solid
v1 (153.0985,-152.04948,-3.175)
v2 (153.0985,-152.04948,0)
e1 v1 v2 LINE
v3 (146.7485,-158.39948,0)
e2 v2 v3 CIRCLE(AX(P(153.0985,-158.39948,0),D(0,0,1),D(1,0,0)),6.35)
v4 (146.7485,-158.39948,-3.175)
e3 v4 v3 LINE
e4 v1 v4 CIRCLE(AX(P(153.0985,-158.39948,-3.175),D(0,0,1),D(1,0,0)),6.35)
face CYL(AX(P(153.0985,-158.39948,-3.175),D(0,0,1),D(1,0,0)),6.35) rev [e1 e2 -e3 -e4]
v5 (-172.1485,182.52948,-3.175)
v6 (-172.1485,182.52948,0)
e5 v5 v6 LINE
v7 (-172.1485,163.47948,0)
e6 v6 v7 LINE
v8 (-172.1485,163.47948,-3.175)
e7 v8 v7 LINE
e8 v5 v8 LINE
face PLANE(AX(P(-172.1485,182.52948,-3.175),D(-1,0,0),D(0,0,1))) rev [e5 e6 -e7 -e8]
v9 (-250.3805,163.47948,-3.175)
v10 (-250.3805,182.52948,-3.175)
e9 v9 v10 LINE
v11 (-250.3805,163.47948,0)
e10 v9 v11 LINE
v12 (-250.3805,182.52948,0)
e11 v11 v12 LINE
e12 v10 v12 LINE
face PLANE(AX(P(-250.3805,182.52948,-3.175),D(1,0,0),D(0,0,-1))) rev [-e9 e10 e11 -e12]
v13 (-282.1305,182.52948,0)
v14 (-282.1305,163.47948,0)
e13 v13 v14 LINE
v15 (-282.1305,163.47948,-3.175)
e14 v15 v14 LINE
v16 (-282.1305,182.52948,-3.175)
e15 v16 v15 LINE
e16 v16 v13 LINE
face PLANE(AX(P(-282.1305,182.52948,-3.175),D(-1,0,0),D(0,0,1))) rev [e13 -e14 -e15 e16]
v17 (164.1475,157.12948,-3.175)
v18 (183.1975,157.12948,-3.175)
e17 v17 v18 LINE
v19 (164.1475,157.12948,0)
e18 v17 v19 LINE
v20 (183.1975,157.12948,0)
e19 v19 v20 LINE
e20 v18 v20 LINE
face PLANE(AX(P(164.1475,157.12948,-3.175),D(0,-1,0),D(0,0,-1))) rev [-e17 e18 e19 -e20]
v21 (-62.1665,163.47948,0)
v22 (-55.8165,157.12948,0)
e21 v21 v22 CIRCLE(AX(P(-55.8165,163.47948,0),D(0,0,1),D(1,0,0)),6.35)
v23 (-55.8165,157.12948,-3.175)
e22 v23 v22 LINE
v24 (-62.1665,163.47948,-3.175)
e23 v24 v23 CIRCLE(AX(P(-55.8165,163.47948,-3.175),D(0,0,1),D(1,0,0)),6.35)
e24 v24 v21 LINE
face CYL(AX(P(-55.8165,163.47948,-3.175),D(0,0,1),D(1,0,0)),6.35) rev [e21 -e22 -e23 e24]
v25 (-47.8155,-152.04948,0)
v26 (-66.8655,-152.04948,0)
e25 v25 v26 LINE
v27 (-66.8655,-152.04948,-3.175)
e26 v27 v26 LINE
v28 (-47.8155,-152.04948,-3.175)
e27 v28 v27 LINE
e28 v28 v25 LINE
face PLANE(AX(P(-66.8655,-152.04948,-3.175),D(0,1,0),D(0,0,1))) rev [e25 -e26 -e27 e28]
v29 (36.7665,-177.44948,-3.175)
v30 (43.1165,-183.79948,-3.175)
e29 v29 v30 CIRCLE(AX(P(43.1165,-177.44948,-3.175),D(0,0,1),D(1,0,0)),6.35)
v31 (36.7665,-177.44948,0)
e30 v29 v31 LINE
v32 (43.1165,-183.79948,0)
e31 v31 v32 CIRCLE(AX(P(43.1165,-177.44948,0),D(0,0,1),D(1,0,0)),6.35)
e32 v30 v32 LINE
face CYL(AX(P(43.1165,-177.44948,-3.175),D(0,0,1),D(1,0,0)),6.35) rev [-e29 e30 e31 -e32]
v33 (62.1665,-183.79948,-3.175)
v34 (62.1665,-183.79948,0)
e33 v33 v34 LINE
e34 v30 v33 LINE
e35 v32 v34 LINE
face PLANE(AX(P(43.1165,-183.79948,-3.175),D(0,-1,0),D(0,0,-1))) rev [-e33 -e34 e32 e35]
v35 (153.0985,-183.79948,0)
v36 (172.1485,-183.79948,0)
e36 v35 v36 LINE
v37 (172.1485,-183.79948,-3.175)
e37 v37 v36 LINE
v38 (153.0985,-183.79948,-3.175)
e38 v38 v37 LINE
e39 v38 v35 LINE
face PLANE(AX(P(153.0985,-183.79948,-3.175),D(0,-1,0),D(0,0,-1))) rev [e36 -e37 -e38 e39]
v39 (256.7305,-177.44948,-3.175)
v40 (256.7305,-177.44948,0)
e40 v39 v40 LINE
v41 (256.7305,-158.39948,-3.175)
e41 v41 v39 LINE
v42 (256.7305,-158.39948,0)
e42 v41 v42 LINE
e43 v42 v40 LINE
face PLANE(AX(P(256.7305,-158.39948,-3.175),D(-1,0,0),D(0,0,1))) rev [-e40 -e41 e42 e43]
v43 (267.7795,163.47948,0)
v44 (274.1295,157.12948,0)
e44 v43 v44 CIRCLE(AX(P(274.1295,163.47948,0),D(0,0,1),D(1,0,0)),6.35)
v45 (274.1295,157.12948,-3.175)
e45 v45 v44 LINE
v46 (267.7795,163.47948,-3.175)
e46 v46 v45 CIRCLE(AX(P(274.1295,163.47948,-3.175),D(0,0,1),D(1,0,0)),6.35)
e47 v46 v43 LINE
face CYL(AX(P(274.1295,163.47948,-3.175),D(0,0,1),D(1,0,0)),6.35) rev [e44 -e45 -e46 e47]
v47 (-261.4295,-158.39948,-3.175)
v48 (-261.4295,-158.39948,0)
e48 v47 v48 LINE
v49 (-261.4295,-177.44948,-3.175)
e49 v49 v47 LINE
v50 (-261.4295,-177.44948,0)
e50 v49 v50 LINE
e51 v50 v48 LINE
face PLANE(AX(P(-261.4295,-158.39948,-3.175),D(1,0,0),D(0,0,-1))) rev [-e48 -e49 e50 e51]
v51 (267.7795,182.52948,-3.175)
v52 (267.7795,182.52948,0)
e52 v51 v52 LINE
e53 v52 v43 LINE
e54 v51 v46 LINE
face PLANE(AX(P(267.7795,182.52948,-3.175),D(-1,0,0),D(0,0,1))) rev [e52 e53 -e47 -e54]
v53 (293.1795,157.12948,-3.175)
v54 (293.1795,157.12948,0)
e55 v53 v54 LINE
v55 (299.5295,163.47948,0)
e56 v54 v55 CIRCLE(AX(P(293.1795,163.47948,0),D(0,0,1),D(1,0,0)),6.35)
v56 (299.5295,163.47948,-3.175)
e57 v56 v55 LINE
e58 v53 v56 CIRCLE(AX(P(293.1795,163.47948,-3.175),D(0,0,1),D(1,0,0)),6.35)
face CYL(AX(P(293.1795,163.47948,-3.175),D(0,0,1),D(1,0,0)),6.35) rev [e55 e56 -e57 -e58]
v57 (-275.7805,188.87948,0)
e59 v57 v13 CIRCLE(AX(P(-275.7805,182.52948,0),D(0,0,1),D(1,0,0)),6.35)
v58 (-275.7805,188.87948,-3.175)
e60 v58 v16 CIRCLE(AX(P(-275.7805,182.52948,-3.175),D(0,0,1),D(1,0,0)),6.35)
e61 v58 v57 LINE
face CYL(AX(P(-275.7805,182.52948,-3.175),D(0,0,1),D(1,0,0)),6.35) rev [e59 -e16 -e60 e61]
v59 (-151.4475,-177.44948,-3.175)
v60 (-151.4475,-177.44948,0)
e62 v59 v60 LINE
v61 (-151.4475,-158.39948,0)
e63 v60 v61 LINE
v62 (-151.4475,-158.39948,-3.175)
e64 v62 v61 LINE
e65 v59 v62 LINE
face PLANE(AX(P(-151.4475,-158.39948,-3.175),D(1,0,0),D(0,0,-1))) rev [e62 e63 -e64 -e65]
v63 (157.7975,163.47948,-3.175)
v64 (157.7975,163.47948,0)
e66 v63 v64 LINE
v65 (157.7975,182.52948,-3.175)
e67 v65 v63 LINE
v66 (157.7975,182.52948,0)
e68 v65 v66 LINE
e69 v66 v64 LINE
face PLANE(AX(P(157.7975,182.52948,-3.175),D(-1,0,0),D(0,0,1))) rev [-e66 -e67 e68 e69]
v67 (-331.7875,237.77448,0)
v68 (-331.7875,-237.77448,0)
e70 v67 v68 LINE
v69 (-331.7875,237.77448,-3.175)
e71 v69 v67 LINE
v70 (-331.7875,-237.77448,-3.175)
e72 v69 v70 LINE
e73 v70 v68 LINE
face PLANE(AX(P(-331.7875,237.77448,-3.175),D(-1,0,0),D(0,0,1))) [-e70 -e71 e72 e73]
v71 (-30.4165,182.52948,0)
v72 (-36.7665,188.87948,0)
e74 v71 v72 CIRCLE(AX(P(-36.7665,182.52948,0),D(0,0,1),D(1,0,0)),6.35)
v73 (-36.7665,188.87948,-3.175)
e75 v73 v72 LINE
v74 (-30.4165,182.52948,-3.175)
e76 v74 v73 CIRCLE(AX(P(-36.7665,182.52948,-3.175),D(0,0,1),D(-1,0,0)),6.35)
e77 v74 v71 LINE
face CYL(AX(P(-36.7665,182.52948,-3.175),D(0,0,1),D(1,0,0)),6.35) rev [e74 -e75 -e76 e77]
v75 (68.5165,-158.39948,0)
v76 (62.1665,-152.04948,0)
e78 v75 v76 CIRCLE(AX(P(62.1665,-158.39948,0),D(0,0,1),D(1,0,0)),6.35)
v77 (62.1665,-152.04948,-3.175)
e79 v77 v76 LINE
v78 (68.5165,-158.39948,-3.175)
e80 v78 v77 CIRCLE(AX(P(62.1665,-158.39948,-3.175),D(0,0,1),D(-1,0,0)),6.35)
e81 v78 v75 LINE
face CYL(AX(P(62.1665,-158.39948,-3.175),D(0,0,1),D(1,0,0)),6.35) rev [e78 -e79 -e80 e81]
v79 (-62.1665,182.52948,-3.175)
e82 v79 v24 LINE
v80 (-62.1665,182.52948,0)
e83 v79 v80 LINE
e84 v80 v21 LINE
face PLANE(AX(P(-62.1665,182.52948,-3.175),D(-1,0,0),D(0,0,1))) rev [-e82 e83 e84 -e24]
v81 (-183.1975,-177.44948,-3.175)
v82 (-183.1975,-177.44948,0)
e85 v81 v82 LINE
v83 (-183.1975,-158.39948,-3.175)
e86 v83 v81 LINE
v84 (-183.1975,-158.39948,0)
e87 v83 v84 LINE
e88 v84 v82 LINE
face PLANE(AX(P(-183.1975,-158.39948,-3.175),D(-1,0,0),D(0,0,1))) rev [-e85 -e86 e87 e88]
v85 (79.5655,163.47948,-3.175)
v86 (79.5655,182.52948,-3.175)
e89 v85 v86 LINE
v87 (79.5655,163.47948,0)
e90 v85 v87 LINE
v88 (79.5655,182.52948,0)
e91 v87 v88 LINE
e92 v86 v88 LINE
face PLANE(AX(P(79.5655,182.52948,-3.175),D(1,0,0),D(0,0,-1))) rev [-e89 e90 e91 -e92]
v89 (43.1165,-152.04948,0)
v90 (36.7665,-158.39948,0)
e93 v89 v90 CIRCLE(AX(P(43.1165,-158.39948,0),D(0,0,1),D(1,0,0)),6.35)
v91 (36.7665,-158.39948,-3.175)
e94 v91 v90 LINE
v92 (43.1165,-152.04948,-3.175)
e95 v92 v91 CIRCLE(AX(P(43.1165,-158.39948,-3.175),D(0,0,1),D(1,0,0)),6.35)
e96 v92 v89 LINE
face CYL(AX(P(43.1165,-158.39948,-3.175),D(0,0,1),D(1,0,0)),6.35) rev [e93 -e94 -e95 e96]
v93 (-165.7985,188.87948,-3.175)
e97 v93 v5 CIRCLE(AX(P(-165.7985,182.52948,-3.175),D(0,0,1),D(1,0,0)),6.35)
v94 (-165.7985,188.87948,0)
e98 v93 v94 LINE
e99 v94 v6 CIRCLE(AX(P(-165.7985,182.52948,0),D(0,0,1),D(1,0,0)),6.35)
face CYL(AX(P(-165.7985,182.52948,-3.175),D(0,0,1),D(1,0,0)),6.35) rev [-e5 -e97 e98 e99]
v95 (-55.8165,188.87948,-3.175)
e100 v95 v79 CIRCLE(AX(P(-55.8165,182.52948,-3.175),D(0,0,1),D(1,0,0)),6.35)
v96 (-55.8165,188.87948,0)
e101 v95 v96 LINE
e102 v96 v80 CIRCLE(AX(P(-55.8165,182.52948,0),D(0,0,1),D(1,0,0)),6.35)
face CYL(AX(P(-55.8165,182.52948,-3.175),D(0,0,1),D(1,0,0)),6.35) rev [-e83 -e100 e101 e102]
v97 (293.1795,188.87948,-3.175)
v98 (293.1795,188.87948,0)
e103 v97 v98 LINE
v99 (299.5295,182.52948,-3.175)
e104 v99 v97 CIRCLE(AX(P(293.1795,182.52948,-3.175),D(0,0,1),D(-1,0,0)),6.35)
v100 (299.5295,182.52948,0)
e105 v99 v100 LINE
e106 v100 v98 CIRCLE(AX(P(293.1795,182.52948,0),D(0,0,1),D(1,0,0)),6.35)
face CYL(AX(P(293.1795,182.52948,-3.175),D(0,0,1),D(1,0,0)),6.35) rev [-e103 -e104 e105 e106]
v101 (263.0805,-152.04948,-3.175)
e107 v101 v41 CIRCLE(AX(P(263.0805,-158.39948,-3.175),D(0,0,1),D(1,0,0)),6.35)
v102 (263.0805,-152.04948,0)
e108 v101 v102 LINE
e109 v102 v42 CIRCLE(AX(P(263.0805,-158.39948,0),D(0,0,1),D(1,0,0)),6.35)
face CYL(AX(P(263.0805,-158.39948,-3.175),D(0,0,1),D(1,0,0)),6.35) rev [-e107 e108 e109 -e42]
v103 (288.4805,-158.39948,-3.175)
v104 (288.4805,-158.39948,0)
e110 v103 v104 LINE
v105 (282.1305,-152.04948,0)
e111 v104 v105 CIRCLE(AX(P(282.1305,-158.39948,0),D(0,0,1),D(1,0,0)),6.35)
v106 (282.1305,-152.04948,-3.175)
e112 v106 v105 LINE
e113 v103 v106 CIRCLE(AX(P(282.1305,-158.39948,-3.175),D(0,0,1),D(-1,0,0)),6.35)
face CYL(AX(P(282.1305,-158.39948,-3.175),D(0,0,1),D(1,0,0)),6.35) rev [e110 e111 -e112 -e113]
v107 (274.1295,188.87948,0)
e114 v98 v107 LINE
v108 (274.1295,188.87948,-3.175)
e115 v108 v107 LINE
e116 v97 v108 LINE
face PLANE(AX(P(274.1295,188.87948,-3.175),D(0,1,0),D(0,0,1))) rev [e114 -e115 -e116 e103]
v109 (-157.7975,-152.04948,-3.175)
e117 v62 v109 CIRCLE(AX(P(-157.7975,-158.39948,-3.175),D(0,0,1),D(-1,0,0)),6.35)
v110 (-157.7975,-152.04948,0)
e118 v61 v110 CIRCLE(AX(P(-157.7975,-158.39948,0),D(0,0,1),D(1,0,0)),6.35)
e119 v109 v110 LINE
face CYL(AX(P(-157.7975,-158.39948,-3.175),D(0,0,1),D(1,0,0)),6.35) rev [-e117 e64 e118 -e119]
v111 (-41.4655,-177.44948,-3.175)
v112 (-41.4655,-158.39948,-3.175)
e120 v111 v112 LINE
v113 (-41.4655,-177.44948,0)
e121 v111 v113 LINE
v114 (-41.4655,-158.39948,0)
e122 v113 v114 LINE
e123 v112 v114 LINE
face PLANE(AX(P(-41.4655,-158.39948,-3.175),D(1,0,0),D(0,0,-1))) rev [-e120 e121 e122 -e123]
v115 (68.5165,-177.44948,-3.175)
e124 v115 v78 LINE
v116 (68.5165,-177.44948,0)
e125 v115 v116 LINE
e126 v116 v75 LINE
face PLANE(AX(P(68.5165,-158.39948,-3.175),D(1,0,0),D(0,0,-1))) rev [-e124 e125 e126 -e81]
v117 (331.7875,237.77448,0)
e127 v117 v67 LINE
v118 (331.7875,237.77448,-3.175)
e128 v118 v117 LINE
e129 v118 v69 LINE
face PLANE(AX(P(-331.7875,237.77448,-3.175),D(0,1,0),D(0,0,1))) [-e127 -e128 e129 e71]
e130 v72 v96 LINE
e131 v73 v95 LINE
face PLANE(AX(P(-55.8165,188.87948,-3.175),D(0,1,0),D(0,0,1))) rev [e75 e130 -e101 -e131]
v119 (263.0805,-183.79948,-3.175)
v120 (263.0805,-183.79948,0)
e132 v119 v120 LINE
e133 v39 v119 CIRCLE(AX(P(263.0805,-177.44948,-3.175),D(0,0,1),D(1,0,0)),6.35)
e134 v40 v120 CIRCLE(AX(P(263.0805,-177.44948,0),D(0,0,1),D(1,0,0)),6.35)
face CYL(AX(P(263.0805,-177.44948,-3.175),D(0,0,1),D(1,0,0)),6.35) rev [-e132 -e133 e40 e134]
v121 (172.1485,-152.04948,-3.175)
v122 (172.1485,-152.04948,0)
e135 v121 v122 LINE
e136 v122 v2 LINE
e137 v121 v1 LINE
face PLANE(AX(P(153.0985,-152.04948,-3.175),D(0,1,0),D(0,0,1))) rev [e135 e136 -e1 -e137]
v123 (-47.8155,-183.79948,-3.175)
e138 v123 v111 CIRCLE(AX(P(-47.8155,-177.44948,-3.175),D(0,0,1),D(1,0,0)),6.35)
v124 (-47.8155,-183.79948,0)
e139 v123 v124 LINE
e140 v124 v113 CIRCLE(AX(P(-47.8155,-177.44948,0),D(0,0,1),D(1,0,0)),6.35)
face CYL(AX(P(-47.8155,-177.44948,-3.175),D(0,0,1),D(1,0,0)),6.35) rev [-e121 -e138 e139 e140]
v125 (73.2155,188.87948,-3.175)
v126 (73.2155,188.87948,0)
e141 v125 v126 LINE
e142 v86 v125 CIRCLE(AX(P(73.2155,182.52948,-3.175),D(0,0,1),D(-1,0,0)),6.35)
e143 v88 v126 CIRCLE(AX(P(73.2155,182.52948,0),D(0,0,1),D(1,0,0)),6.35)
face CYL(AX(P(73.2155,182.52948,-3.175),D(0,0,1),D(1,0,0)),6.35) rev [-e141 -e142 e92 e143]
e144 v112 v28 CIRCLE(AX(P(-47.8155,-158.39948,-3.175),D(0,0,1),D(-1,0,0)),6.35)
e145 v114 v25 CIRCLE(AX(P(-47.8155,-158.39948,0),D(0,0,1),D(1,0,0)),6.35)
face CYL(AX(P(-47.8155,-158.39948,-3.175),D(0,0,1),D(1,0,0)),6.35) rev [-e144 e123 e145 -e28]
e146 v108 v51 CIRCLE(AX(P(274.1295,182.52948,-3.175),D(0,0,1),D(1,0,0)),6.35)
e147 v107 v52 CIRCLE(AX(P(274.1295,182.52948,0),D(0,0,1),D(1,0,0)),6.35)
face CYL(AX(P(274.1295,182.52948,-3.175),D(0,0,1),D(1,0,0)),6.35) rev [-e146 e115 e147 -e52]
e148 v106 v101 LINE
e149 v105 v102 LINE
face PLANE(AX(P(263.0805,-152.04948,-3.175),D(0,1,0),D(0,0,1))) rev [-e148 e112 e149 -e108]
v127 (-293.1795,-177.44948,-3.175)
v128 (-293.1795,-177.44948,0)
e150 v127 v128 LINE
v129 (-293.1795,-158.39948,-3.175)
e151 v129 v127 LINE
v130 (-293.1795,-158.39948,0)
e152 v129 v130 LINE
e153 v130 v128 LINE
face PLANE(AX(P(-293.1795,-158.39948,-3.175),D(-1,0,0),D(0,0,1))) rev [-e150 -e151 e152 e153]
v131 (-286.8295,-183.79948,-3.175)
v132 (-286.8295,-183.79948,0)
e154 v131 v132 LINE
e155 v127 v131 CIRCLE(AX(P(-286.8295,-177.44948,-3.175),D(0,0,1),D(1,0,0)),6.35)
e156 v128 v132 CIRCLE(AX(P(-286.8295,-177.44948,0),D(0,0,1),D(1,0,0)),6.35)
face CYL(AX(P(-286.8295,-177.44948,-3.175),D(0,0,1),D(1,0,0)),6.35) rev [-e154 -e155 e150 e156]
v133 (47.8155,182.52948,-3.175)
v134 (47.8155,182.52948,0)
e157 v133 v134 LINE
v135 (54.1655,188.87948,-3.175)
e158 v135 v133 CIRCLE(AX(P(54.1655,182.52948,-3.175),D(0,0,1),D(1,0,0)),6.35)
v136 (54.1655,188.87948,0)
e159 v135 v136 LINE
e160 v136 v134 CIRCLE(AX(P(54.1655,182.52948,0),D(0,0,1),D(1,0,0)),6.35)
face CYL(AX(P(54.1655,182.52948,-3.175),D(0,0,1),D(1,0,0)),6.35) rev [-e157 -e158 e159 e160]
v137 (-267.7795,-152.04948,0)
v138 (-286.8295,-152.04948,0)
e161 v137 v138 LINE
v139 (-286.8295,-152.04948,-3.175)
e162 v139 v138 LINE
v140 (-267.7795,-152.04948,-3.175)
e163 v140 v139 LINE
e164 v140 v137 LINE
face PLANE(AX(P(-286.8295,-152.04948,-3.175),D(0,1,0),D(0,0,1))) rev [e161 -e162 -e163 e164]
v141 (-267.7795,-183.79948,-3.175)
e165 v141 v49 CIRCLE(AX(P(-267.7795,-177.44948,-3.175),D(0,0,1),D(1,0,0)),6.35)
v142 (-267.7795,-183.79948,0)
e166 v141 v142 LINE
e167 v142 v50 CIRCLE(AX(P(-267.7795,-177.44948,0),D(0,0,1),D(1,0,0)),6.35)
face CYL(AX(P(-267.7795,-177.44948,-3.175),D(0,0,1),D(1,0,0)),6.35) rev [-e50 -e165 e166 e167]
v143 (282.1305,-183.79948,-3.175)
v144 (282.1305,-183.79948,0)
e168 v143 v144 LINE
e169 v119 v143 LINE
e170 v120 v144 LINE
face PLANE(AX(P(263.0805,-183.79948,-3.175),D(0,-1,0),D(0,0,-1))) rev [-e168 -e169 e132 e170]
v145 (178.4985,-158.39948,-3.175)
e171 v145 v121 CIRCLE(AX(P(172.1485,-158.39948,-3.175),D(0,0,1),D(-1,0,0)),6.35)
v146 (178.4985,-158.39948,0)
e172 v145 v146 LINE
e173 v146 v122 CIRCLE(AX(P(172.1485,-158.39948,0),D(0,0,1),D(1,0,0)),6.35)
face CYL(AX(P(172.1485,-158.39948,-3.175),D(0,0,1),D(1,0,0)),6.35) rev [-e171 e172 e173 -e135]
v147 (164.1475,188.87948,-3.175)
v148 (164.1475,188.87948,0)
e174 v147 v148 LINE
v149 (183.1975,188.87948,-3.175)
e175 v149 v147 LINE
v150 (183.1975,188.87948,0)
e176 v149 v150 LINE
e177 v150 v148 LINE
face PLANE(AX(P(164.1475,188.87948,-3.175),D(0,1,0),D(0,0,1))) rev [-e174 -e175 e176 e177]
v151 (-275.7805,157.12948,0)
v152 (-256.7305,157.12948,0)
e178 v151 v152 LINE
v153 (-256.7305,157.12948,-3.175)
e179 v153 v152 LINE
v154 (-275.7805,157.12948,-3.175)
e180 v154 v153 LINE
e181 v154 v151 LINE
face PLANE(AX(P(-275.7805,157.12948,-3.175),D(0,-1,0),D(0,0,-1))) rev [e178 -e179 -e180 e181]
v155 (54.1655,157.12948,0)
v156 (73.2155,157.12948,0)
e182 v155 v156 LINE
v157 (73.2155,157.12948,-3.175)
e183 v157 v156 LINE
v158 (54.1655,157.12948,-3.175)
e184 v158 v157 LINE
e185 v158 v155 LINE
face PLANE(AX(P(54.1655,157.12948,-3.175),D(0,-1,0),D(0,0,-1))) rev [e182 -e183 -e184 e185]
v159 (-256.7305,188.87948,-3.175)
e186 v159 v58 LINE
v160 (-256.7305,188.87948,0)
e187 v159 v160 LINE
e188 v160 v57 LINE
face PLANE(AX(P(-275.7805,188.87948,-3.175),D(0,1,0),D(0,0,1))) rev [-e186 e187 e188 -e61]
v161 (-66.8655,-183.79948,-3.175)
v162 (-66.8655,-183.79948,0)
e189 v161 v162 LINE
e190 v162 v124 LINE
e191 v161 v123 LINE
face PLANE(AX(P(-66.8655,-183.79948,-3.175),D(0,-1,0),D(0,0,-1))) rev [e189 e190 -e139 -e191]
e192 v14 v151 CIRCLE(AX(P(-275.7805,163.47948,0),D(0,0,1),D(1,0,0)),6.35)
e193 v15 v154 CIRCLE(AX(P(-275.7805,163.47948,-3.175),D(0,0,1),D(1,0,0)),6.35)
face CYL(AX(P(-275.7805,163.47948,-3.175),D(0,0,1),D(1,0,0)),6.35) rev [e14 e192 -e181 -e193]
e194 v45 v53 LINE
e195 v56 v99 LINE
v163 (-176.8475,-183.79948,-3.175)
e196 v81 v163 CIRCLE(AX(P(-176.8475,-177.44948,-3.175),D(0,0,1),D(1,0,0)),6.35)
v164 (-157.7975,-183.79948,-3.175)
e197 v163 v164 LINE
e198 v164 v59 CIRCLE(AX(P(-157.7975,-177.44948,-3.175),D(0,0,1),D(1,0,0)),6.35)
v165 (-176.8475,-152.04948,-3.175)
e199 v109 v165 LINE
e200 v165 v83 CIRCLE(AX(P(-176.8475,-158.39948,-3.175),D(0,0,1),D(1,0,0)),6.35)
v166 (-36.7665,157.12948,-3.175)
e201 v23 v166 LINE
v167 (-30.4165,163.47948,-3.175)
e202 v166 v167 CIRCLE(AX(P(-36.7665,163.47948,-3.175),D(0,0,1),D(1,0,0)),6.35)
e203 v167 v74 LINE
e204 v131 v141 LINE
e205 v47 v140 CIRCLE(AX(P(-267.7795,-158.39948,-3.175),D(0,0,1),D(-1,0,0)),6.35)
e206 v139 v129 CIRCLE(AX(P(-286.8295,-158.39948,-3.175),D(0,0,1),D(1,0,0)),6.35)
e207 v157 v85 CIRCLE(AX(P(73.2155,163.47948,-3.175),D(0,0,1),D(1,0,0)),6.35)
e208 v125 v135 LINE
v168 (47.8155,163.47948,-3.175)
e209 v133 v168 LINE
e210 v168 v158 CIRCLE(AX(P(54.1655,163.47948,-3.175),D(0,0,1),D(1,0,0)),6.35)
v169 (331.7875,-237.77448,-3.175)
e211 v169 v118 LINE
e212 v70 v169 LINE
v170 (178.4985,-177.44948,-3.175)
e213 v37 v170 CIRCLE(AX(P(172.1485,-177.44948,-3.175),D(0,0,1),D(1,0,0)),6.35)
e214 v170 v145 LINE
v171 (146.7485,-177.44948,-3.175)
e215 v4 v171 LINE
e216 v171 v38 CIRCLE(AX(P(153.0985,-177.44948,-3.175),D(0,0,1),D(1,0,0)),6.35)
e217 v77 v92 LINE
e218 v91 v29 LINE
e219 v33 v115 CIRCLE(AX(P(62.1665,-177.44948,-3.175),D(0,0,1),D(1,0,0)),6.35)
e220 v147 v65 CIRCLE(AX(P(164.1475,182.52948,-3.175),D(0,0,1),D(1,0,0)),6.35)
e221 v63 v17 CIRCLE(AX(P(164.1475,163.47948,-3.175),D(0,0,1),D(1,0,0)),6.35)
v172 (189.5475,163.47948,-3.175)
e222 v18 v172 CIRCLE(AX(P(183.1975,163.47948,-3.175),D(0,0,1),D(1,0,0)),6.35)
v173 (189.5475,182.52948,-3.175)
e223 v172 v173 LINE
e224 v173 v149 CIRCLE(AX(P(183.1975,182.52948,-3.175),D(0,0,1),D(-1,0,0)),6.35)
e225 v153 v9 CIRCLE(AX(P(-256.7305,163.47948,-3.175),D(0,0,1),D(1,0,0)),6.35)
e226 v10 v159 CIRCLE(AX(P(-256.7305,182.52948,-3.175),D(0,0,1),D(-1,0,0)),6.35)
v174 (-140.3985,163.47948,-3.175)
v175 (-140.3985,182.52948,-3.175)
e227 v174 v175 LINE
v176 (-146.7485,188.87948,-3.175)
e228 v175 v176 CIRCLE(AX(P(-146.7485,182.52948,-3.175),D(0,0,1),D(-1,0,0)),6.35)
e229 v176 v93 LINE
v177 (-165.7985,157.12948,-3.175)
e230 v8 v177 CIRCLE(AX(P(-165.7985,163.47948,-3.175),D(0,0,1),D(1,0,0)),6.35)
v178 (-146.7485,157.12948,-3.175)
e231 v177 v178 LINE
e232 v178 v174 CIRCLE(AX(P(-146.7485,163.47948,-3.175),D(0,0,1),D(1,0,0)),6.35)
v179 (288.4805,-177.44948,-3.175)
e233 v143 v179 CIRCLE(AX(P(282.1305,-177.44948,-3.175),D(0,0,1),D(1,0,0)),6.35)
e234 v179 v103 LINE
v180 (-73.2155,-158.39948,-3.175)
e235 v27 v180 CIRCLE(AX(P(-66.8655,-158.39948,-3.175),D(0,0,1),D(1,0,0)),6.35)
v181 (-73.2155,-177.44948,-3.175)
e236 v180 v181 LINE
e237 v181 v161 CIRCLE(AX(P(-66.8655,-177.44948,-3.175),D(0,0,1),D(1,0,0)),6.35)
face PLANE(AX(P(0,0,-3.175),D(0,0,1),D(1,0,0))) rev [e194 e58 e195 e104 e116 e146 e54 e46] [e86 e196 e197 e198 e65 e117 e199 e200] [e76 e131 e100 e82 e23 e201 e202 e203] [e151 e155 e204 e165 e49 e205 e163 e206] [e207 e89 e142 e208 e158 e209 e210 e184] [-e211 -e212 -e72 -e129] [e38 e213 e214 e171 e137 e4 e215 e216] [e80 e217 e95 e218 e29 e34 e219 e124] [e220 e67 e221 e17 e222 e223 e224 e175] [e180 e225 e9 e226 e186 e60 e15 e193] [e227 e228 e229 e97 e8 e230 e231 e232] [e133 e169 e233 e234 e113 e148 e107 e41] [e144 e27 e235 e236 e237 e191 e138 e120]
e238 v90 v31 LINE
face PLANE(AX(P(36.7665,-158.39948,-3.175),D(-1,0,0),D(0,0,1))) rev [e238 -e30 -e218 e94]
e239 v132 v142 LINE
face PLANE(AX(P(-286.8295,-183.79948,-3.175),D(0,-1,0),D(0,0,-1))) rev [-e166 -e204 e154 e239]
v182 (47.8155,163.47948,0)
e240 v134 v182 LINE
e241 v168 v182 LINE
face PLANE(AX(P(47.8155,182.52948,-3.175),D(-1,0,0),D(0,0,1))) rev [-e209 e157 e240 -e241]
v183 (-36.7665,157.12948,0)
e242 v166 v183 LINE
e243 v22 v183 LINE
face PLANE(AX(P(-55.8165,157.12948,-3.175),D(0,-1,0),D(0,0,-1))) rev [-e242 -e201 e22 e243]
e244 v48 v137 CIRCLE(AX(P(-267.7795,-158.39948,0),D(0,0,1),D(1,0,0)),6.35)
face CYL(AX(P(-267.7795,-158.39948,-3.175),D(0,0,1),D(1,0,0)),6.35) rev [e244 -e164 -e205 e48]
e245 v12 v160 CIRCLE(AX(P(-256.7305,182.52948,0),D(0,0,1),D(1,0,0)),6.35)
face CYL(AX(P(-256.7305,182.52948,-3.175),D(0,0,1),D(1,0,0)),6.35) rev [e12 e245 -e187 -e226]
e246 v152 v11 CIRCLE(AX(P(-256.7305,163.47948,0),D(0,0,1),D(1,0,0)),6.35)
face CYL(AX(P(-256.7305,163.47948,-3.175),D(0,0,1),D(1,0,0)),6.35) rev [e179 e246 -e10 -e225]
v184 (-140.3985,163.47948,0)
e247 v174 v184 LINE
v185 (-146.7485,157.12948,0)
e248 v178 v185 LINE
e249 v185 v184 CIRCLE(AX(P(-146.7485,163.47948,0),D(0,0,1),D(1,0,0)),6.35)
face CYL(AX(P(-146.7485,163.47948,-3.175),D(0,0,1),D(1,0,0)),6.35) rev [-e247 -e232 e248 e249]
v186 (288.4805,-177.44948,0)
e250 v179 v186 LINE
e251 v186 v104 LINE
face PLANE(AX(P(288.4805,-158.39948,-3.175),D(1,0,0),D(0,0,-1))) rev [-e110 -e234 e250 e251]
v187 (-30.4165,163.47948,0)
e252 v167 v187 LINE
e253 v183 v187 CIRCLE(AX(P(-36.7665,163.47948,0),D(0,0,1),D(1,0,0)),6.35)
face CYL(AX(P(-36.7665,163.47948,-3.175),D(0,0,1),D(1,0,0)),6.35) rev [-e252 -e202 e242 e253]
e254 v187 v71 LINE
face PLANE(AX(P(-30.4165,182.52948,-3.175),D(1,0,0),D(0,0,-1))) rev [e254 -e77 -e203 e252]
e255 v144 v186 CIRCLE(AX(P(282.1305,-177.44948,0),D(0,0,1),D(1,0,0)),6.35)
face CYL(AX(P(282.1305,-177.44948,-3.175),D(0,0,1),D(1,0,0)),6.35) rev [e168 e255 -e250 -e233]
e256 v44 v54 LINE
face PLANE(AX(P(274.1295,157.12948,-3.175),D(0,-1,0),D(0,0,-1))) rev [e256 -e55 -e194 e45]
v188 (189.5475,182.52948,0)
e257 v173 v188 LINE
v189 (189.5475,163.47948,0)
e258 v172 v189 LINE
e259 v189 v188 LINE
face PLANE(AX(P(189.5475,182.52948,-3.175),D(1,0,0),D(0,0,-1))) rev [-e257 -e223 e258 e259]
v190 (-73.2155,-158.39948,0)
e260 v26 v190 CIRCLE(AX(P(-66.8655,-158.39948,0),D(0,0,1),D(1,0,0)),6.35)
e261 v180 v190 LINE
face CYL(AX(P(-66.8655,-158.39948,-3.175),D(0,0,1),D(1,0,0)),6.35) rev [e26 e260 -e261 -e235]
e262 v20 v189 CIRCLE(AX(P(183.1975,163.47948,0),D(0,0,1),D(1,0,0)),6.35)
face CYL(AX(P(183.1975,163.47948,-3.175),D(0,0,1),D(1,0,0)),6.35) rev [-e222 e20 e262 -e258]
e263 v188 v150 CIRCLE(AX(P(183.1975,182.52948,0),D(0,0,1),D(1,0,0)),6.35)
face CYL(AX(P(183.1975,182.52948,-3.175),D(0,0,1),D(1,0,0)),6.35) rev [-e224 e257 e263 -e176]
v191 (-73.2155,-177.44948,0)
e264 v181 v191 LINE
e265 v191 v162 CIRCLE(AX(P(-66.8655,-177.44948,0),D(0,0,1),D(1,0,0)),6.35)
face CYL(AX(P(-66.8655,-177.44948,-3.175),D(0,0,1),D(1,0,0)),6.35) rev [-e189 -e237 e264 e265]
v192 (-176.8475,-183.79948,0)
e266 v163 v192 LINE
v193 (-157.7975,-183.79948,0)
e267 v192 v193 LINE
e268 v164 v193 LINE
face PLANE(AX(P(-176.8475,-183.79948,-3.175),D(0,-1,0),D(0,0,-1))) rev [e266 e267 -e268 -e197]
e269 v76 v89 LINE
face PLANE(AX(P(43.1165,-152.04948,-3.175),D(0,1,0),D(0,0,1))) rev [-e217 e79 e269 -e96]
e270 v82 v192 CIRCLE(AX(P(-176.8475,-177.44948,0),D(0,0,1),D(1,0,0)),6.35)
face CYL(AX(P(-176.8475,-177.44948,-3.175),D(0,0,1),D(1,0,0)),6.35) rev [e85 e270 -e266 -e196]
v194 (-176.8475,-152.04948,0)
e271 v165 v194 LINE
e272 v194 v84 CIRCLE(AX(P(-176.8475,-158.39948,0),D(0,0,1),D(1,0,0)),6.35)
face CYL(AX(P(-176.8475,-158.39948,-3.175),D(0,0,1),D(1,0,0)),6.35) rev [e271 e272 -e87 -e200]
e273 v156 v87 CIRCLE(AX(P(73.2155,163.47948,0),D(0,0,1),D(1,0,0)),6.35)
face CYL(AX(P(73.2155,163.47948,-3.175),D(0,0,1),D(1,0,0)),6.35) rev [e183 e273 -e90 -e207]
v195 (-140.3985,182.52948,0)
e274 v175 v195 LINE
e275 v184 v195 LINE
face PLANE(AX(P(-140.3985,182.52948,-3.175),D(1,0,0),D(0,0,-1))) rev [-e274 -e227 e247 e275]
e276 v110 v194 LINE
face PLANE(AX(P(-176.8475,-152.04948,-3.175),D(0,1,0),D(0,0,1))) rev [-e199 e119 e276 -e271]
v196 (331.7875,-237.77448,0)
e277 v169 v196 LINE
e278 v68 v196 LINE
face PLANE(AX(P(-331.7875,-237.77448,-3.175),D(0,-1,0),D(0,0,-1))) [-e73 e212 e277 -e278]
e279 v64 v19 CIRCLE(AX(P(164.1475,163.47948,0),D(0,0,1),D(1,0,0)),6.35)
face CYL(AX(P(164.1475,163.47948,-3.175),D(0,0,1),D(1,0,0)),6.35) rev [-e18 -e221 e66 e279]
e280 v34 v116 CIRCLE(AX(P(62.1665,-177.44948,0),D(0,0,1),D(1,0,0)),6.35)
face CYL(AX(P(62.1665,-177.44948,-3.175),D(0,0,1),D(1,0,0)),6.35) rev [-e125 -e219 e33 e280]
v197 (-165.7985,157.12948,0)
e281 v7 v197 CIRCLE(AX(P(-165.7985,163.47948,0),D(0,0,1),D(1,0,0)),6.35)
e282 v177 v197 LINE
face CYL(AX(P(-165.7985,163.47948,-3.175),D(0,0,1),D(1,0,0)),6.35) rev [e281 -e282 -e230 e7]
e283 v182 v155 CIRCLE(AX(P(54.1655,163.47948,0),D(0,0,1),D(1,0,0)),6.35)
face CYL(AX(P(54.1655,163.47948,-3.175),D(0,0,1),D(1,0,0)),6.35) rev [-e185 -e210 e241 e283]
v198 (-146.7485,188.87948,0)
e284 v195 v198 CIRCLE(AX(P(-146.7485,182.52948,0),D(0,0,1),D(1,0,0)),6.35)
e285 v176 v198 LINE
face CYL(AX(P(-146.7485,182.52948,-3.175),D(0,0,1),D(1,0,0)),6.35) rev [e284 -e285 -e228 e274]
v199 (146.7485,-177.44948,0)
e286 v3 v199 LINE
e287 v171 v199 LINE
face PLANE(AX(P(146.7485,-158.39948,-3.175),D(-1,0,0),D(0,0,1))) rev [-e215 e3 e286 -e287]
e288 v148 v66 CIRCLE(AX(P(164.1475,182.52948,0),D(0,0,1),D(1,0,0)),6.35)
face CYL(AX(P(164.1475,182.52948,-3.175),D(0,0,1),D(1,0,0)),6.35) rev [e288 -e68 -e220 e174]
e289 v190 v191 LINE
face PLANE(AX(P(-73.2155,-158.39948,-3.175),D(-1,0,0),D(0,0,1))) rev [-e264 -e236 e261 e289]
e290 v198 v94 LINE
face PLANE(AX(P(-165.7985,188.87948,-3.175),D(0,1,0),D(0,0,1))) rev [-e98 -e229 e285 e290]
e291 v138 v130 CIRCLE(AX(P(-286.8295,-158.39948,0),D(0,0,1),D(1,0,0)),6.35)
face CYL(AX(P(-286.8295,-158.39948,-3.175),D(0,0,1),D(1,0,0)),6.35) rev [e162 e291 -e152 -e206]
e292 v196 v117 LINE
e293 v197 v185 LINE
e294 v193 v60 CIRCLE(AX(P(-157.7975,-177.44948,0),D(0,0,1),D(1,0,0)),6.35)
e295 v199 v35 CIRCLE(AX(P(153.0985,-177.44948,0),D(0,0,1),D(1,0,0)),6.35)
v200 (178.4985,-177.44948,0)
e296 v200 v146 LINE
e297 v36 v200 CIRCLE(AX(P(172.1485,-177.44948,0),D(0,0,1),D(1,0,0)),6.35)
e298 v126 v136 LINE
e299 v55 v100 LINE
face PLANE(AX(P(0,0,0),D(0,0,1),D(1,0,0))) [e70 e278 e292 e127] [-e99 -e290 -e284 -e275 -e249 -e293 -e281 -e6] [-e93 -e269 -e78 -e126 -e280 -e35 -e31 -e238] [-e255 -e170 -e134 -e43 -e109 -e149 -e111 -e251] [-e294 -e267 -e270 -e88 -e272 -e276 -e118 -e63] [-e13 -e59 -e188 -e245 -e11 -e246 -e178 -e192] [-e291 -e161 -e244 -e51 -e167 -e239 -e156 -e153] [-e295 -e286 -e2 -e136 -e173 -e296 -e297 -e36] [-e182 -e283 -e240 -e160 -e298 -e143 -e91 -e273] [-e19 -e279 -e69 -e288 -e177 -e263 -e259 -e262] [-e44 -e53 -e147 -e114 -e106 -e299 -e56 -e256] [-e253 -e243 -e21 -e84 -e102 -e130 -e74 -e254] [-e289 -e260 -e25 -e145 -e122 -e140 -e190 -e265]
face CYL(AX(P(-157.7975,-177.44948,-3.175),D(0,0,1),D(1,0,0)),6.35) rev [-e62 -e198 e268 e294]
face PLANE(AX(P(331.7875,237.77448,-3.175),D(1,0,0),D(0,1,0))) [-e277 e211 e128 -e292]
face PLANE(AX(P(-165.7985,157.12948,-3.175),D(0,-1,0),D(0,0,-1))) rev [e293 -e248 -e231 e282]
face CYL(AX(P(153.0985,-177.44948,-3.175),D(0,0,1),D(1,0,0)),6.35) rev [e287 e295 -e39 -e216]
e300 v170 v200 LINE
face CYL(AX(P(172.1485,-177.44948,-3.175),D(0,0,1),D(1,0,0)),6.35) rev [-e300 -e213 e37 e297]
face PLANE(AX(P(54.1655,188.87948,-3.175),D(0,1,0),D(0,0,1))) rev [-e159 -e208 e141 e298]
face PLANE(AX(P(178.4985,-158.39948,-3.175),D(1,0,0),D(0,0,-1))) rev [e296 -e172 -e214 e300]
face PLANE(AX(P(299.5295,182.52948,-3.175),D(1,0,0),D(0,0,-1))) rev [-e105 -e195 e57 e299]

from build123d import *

# Parameters (mm, degrees)
SKETCH1_W               = 663.575
SKETCH1_H               = 475.54896
BASE_FLANGE1_DEPTH      = 3.175
CUT_EXTRUDE1_DEPTH      = 409.203048887
CUT_EXTRUDE1_DEPTH_BACK = 409.203048887


# Sheet-metal steps are written as plain solids
with BuildPart() as part:
    # Sketch1 → Base-Flange1 (new body)
    with BuildSketch(Plane.XY):
        Rectangle(SKETCH1_W, SKETCH1_H)
    extrude(amount=-BASE_FLANGE1_DEPTH)

    # Sketch6 → Cut-Extrude1 (cut, two sides: drawn at the far end of the back side and taken through both)
    with BuildSketch(Plane.XY.offset(-CUT_EXTRUDE1_DEPTH_BACK)):
        with BuildLine():
            Line((263.0805, -152.04948), (282.1305, -152.04948))
            ThreePointArc((282.1305, -152.04948), (286.620628061, -153.909351939), (288.4805, -158.39948))
            Line((288.4805, -158.39948), (288.4805, -177.44948))
            ThreePointArc((288.4805, -177.44948), (286.620628061, -181.939608061), (282.1305, -183.79948))
            Line((282.1305, -183.79948), (263.0805, -183.79948))
            ThreePointArc((263.0805, -183.79948), (258.590371939, -181.939608061), (256.7305, -177.44948))
            Line((256.7305, -177.44948), (256.7305, -158.39948))
            ThreePointArc((256.7305, -158.39948), (258.590371939, -153.909351939), (263.0805, -152.04948))
        make_face()
        with BuildLine():
            Line((153.0985, -152.04948), (172.1485, -152.04948))
            ThreePointArc((172.1485, -152.04948), (176.638628061, -153.909351939), (178.4985, -158.39948))
            Line((178.4985, -158.39948), (178.4985, -177.44948))
            ThreePointArc((178.4985, -177.44948), (176.638628061, -181.939608061), (172.1485, -183.79948))
            Line((172.1485, -183.79948), (153.0985, -183.79948))
            ThreePointArc((153.0985, -183.79948), (148.608371939, -181.939608061), (146.7485, -177.44948))
            Line((146.7485, -177.44948), (146.7485, -158.39948))
            ThreePointArc((146.7485, -158.39948), (148.608371939, -153.909351939), (153.0985, -152.04948))
        make_face()
        with BuildLine():
            Line((43.1165, -152.04948), (62.1665, -152.04948))
            ThreePointArc((62.1665, -152.04948), (66.656628061, -153.909351939), (68.5165, -158.39948))
            Line((68.5165, -158.39948), (68.5165, -177.44948))
            ThreePointArc((68.5165, -177.44948), (66.656628061, -181.939608061), (62.1665, -183.79948))
            Line((62.1665, -183.79948), (43.1165, -183.79948))
            ThreePointArc((43.1165, -183.79948), (38.626371939, -181.939608061), (36.7665, -177.44948))
            Line((36.7665, -177.44948), (36.7665, -158.39948))
            ThreePointArc((36.7665, -158.39948), (38.626371939, -153.909351939), (43.1165, -152.04948))
        make_face()
        with BuildLine():
            Line((-66.8655, -152.04948), (-47.8155, -152.04948))
            ThreePointArc((-47.8155, -152.04948), (-43.325371939, -153.909351939), (-41.4655, -158.39948))
            Line((-41.4655, -158.39948), (-41.4655, -177.44948))
            ThreePointArc((-41.4655, -177.44948), (-43.325371939, -181.939608061), (-47.8155, -183.79948))
            Line((-47.8155, -183.79948), (-66.8655, -183.79948))
            ThreePointArc((-66.8655, -183.79948), (-71.355628061, -181.939608061), (-73.2155, -177.44948))
            Line((-73.2155, -177.44948), (-73.2155, -158.39948))
            ThreePointArc((-73.2155, -158.39948), (-71.355628061, -153.909351939), (-66.8655, -152.04948))
        make_face()
        with BuildLine():
            Line((-176.8475, -152.04948), (-157.7975, -152.04948))
            ThreePointArc((-157.7975, -152.04948), (-153.307371939, -153.909351939), (-151.4475, -158.39948))
            Line((-151.4475, -158.39948), (-151.4475, -177.44948))
            ThreePointArc((-151.4475, -177.44948), (-153.307371939, -181.939608061), (-157.7975, -183.79948))
            Line((-157.7975, -183.79948), (-176.8475, -183.79948))
            ThreePointArc((-176.8475, -183.79948), (-181.337628061, -181.939608061), (-183.1975, -177.44948))
            Line((-183.1975, -177.44948), (-183.1975, -158.39948))
            ThreePointArc((-183.1975, -158.39948), (-181.337628061, -153.909351939), (-176.8475, -152.04948))
        make_face()
        with BuildLine():
            Line((-286.8295, -152.04948), (-267.7795, -152.04948))
            ThreePointArc((-267.7795, -152.04948), (-263.289371939, -153.909351939), (-261.4295, -158.39948))
            Line((-261.4295, -158.39948), (-261.4295, -177.44948))
            ThreePointArc((-261.4295, -177.44948), (-263.289371939, -181.939608061), (-267.7795, -183.79948))
            Line((-267.7795, -183.79948), (-286.8295, -183.79948))
            ThreePointArc((-286.8295, -183.79948), (-291.319628061, -181.939608061), (-293.1795, -177.44948))
            Line((-293.1795, -177.44948), (-293.1795, -158.39948))
            ThreePointArc((-293.1795, -158.39948), (-291.319628061, -153.909351939), (-286.8295, -152.04948))
        make_face()
        with BuildLine():
            Line((-275.7805, 188.87948), (-256.7305, 188.87948))
            ThreePointArc((-256.7305, 188.87948), (-252.240371939, 187.019608061), (-250.3805, 182.52948))
            Line((-250.3805, 182.52948), (-250.3805, 163.47948))
            ThreePointArc((-250.3805, 163.47948), (-252.240371939, 158.989351939), (-256.7305, 157.12948))
            Line((-256.7305, 157.12948), (-275.7805, 157.12948))
            ThreePointArc((-275.7805, 157.12948), (-280.270628061, 158.989351939), (-282.1305, 163.47948))
            Line((-282.1305, 163.47948), (-282.1305, 182.52948))
            ThreePointArc((-282.1305, 182.52948), (-280.270628061, 187.019608061), (-275.7805, 188.87948))
        make_face()
        with BuildLine():
            Line((-165.7985, 188.87948), (-146.7485, 188.87948))
            ThreePointArc((-146.7485, 188.87948), (-142.258371939, 187.019608061), (-140.3985, 182.52948))
            Line((-140.3985, 182.52948), (-140.3985, 163.47948))
            ThreePointArc((-140.3985, 163.47948), (-142.258371939, 158.989351939), (-146.7485, 157.12948))
            Line((-146.7485, 157.12948), (-165.7985, 157.12948))
            ThreePointArc((-165.7985, 157.12948), (-170.288628061, 158.989351939), (-172.1485, 163.47948))
            Line((-172.1485, 163.47948), (-172.1485, 182.52948))
            ThreePointArc((-172.1485, 182.52948), (-170.288628061, 187.019608061), (-165.7985, 188.87948))
        make_face()
        with BuildLine():
            Line((-55.8165, 188.87948), (-36.7665, 188.87948))
            ThreePointArc((-36.7665, 188.87948), (-32.276371939, 187.019608061), (-30.4165, 182.52948))
            Line((-30.4165, 182.52948), (-30.4165, 163.47948))
            ThreePointArc((-30.4165, 163.47948), (-32.276371939, 158.989351939), (-36.7665, 157.12948))
            Line((-36.7665, 157.12948), (-55.8165, 157.12948))
            ThreePointArc((-55.8165, 157.12948), (-60.306628061, 158.989351939), (-62.1665, 163.47948))
            Line((-62.1665, 163.47948), (-62.1665, 182.52948))
            ThreePointArc((-62.1665, 182.52948), (-60.306628061, 187.019608061), (-55.8165, 188.87948))
        make_face()
        with BuildLine():
            Line((54.1655, 188.87948), (73.2155, 188.87948))
            ThreePointArc((73.2155, 188.87948), (77.705628061, 187.019608061), (79.5655, 182.52948))
            Line((79.5655, 182.52948), (79.5655, 163.47948))
            ThreePointArc((79.5655, 163.47948), (77.705628061, 158.989351939), (73.2155, 157.12948))
            Line((73.2155, 157.12948), (54.1655, 157.12948))
            ThreePointArc((54.1655, 157.12948), (49.675371939, 158.989351939), (47.8155, 163.47948))
            Line((47.8155, 163.47948), (47.8155, 182.52948))
            ThreePointArc((47.8155, 182.52948), (49.675371939, 187.019608061), (54.1655, 188.87948))
        make_face()
        with BuildLine():
            Line((164.1475, 188.87948), (183.1975, 188.87948))
            ThreePointArc((183.1975, 188.87948), (187.687628061, 187.019608061), (189.5475, 182.52948))
            Line((189.5475, 182.52948), (189.5475, 163.47948))
            ThreePointArc((189.5475, 163.47948), (187.687628061, 158.989351939), (183.1975, 157.12948))
            Line((183.1975, 157.12948), (164.1475, 157.12948))
            ThreePointArc((164.1475, 157.12948), (159.657371939, 158.989351939), (157.7975, 163.47948))
            Line((157.7975, 163.47948), (157.7975, 182.52948))
            ThreePointArc((157.7975, 182.52948), (159.657371939, 187.019608061), (164.1475, 188.87948))
        make_face()
        with BuildLine():
            Line((274.1295, 188.87948), (293.1795, 188.87948))
            ThreePointArc((293.1795, 188.87948), (297.669628061, 187.019608061), (299.5295, 182.52948))
            Line((299.5295, 182.52948), (299.5295, 163.47948))
            ThreePointArc((299.5295, 163.47948), (297.669628061, 158.989351939), (293.1795, 157.12948))
            Line((293.1795, 157.12948), (274.1295, 157.12948))
            ThreePointArc((274.1295, 157.12948), (269.639371939, 158.989351939), (267.7795, 163.47948))
            Line((267.7795, 163.47948), (267.7795, 182.52948))
            ThreePointArc((267.7795, 182.52948), (269.639371939, 187.019608061), (274.1295, 188.87948))
        make_face()
    extrude(amount=CUT_EXTRUDE1_DEPTH + CUT_EXTRUDE1_DEPTH_BACK, mode=Mode.SUBTRACT)


solid = part.part
